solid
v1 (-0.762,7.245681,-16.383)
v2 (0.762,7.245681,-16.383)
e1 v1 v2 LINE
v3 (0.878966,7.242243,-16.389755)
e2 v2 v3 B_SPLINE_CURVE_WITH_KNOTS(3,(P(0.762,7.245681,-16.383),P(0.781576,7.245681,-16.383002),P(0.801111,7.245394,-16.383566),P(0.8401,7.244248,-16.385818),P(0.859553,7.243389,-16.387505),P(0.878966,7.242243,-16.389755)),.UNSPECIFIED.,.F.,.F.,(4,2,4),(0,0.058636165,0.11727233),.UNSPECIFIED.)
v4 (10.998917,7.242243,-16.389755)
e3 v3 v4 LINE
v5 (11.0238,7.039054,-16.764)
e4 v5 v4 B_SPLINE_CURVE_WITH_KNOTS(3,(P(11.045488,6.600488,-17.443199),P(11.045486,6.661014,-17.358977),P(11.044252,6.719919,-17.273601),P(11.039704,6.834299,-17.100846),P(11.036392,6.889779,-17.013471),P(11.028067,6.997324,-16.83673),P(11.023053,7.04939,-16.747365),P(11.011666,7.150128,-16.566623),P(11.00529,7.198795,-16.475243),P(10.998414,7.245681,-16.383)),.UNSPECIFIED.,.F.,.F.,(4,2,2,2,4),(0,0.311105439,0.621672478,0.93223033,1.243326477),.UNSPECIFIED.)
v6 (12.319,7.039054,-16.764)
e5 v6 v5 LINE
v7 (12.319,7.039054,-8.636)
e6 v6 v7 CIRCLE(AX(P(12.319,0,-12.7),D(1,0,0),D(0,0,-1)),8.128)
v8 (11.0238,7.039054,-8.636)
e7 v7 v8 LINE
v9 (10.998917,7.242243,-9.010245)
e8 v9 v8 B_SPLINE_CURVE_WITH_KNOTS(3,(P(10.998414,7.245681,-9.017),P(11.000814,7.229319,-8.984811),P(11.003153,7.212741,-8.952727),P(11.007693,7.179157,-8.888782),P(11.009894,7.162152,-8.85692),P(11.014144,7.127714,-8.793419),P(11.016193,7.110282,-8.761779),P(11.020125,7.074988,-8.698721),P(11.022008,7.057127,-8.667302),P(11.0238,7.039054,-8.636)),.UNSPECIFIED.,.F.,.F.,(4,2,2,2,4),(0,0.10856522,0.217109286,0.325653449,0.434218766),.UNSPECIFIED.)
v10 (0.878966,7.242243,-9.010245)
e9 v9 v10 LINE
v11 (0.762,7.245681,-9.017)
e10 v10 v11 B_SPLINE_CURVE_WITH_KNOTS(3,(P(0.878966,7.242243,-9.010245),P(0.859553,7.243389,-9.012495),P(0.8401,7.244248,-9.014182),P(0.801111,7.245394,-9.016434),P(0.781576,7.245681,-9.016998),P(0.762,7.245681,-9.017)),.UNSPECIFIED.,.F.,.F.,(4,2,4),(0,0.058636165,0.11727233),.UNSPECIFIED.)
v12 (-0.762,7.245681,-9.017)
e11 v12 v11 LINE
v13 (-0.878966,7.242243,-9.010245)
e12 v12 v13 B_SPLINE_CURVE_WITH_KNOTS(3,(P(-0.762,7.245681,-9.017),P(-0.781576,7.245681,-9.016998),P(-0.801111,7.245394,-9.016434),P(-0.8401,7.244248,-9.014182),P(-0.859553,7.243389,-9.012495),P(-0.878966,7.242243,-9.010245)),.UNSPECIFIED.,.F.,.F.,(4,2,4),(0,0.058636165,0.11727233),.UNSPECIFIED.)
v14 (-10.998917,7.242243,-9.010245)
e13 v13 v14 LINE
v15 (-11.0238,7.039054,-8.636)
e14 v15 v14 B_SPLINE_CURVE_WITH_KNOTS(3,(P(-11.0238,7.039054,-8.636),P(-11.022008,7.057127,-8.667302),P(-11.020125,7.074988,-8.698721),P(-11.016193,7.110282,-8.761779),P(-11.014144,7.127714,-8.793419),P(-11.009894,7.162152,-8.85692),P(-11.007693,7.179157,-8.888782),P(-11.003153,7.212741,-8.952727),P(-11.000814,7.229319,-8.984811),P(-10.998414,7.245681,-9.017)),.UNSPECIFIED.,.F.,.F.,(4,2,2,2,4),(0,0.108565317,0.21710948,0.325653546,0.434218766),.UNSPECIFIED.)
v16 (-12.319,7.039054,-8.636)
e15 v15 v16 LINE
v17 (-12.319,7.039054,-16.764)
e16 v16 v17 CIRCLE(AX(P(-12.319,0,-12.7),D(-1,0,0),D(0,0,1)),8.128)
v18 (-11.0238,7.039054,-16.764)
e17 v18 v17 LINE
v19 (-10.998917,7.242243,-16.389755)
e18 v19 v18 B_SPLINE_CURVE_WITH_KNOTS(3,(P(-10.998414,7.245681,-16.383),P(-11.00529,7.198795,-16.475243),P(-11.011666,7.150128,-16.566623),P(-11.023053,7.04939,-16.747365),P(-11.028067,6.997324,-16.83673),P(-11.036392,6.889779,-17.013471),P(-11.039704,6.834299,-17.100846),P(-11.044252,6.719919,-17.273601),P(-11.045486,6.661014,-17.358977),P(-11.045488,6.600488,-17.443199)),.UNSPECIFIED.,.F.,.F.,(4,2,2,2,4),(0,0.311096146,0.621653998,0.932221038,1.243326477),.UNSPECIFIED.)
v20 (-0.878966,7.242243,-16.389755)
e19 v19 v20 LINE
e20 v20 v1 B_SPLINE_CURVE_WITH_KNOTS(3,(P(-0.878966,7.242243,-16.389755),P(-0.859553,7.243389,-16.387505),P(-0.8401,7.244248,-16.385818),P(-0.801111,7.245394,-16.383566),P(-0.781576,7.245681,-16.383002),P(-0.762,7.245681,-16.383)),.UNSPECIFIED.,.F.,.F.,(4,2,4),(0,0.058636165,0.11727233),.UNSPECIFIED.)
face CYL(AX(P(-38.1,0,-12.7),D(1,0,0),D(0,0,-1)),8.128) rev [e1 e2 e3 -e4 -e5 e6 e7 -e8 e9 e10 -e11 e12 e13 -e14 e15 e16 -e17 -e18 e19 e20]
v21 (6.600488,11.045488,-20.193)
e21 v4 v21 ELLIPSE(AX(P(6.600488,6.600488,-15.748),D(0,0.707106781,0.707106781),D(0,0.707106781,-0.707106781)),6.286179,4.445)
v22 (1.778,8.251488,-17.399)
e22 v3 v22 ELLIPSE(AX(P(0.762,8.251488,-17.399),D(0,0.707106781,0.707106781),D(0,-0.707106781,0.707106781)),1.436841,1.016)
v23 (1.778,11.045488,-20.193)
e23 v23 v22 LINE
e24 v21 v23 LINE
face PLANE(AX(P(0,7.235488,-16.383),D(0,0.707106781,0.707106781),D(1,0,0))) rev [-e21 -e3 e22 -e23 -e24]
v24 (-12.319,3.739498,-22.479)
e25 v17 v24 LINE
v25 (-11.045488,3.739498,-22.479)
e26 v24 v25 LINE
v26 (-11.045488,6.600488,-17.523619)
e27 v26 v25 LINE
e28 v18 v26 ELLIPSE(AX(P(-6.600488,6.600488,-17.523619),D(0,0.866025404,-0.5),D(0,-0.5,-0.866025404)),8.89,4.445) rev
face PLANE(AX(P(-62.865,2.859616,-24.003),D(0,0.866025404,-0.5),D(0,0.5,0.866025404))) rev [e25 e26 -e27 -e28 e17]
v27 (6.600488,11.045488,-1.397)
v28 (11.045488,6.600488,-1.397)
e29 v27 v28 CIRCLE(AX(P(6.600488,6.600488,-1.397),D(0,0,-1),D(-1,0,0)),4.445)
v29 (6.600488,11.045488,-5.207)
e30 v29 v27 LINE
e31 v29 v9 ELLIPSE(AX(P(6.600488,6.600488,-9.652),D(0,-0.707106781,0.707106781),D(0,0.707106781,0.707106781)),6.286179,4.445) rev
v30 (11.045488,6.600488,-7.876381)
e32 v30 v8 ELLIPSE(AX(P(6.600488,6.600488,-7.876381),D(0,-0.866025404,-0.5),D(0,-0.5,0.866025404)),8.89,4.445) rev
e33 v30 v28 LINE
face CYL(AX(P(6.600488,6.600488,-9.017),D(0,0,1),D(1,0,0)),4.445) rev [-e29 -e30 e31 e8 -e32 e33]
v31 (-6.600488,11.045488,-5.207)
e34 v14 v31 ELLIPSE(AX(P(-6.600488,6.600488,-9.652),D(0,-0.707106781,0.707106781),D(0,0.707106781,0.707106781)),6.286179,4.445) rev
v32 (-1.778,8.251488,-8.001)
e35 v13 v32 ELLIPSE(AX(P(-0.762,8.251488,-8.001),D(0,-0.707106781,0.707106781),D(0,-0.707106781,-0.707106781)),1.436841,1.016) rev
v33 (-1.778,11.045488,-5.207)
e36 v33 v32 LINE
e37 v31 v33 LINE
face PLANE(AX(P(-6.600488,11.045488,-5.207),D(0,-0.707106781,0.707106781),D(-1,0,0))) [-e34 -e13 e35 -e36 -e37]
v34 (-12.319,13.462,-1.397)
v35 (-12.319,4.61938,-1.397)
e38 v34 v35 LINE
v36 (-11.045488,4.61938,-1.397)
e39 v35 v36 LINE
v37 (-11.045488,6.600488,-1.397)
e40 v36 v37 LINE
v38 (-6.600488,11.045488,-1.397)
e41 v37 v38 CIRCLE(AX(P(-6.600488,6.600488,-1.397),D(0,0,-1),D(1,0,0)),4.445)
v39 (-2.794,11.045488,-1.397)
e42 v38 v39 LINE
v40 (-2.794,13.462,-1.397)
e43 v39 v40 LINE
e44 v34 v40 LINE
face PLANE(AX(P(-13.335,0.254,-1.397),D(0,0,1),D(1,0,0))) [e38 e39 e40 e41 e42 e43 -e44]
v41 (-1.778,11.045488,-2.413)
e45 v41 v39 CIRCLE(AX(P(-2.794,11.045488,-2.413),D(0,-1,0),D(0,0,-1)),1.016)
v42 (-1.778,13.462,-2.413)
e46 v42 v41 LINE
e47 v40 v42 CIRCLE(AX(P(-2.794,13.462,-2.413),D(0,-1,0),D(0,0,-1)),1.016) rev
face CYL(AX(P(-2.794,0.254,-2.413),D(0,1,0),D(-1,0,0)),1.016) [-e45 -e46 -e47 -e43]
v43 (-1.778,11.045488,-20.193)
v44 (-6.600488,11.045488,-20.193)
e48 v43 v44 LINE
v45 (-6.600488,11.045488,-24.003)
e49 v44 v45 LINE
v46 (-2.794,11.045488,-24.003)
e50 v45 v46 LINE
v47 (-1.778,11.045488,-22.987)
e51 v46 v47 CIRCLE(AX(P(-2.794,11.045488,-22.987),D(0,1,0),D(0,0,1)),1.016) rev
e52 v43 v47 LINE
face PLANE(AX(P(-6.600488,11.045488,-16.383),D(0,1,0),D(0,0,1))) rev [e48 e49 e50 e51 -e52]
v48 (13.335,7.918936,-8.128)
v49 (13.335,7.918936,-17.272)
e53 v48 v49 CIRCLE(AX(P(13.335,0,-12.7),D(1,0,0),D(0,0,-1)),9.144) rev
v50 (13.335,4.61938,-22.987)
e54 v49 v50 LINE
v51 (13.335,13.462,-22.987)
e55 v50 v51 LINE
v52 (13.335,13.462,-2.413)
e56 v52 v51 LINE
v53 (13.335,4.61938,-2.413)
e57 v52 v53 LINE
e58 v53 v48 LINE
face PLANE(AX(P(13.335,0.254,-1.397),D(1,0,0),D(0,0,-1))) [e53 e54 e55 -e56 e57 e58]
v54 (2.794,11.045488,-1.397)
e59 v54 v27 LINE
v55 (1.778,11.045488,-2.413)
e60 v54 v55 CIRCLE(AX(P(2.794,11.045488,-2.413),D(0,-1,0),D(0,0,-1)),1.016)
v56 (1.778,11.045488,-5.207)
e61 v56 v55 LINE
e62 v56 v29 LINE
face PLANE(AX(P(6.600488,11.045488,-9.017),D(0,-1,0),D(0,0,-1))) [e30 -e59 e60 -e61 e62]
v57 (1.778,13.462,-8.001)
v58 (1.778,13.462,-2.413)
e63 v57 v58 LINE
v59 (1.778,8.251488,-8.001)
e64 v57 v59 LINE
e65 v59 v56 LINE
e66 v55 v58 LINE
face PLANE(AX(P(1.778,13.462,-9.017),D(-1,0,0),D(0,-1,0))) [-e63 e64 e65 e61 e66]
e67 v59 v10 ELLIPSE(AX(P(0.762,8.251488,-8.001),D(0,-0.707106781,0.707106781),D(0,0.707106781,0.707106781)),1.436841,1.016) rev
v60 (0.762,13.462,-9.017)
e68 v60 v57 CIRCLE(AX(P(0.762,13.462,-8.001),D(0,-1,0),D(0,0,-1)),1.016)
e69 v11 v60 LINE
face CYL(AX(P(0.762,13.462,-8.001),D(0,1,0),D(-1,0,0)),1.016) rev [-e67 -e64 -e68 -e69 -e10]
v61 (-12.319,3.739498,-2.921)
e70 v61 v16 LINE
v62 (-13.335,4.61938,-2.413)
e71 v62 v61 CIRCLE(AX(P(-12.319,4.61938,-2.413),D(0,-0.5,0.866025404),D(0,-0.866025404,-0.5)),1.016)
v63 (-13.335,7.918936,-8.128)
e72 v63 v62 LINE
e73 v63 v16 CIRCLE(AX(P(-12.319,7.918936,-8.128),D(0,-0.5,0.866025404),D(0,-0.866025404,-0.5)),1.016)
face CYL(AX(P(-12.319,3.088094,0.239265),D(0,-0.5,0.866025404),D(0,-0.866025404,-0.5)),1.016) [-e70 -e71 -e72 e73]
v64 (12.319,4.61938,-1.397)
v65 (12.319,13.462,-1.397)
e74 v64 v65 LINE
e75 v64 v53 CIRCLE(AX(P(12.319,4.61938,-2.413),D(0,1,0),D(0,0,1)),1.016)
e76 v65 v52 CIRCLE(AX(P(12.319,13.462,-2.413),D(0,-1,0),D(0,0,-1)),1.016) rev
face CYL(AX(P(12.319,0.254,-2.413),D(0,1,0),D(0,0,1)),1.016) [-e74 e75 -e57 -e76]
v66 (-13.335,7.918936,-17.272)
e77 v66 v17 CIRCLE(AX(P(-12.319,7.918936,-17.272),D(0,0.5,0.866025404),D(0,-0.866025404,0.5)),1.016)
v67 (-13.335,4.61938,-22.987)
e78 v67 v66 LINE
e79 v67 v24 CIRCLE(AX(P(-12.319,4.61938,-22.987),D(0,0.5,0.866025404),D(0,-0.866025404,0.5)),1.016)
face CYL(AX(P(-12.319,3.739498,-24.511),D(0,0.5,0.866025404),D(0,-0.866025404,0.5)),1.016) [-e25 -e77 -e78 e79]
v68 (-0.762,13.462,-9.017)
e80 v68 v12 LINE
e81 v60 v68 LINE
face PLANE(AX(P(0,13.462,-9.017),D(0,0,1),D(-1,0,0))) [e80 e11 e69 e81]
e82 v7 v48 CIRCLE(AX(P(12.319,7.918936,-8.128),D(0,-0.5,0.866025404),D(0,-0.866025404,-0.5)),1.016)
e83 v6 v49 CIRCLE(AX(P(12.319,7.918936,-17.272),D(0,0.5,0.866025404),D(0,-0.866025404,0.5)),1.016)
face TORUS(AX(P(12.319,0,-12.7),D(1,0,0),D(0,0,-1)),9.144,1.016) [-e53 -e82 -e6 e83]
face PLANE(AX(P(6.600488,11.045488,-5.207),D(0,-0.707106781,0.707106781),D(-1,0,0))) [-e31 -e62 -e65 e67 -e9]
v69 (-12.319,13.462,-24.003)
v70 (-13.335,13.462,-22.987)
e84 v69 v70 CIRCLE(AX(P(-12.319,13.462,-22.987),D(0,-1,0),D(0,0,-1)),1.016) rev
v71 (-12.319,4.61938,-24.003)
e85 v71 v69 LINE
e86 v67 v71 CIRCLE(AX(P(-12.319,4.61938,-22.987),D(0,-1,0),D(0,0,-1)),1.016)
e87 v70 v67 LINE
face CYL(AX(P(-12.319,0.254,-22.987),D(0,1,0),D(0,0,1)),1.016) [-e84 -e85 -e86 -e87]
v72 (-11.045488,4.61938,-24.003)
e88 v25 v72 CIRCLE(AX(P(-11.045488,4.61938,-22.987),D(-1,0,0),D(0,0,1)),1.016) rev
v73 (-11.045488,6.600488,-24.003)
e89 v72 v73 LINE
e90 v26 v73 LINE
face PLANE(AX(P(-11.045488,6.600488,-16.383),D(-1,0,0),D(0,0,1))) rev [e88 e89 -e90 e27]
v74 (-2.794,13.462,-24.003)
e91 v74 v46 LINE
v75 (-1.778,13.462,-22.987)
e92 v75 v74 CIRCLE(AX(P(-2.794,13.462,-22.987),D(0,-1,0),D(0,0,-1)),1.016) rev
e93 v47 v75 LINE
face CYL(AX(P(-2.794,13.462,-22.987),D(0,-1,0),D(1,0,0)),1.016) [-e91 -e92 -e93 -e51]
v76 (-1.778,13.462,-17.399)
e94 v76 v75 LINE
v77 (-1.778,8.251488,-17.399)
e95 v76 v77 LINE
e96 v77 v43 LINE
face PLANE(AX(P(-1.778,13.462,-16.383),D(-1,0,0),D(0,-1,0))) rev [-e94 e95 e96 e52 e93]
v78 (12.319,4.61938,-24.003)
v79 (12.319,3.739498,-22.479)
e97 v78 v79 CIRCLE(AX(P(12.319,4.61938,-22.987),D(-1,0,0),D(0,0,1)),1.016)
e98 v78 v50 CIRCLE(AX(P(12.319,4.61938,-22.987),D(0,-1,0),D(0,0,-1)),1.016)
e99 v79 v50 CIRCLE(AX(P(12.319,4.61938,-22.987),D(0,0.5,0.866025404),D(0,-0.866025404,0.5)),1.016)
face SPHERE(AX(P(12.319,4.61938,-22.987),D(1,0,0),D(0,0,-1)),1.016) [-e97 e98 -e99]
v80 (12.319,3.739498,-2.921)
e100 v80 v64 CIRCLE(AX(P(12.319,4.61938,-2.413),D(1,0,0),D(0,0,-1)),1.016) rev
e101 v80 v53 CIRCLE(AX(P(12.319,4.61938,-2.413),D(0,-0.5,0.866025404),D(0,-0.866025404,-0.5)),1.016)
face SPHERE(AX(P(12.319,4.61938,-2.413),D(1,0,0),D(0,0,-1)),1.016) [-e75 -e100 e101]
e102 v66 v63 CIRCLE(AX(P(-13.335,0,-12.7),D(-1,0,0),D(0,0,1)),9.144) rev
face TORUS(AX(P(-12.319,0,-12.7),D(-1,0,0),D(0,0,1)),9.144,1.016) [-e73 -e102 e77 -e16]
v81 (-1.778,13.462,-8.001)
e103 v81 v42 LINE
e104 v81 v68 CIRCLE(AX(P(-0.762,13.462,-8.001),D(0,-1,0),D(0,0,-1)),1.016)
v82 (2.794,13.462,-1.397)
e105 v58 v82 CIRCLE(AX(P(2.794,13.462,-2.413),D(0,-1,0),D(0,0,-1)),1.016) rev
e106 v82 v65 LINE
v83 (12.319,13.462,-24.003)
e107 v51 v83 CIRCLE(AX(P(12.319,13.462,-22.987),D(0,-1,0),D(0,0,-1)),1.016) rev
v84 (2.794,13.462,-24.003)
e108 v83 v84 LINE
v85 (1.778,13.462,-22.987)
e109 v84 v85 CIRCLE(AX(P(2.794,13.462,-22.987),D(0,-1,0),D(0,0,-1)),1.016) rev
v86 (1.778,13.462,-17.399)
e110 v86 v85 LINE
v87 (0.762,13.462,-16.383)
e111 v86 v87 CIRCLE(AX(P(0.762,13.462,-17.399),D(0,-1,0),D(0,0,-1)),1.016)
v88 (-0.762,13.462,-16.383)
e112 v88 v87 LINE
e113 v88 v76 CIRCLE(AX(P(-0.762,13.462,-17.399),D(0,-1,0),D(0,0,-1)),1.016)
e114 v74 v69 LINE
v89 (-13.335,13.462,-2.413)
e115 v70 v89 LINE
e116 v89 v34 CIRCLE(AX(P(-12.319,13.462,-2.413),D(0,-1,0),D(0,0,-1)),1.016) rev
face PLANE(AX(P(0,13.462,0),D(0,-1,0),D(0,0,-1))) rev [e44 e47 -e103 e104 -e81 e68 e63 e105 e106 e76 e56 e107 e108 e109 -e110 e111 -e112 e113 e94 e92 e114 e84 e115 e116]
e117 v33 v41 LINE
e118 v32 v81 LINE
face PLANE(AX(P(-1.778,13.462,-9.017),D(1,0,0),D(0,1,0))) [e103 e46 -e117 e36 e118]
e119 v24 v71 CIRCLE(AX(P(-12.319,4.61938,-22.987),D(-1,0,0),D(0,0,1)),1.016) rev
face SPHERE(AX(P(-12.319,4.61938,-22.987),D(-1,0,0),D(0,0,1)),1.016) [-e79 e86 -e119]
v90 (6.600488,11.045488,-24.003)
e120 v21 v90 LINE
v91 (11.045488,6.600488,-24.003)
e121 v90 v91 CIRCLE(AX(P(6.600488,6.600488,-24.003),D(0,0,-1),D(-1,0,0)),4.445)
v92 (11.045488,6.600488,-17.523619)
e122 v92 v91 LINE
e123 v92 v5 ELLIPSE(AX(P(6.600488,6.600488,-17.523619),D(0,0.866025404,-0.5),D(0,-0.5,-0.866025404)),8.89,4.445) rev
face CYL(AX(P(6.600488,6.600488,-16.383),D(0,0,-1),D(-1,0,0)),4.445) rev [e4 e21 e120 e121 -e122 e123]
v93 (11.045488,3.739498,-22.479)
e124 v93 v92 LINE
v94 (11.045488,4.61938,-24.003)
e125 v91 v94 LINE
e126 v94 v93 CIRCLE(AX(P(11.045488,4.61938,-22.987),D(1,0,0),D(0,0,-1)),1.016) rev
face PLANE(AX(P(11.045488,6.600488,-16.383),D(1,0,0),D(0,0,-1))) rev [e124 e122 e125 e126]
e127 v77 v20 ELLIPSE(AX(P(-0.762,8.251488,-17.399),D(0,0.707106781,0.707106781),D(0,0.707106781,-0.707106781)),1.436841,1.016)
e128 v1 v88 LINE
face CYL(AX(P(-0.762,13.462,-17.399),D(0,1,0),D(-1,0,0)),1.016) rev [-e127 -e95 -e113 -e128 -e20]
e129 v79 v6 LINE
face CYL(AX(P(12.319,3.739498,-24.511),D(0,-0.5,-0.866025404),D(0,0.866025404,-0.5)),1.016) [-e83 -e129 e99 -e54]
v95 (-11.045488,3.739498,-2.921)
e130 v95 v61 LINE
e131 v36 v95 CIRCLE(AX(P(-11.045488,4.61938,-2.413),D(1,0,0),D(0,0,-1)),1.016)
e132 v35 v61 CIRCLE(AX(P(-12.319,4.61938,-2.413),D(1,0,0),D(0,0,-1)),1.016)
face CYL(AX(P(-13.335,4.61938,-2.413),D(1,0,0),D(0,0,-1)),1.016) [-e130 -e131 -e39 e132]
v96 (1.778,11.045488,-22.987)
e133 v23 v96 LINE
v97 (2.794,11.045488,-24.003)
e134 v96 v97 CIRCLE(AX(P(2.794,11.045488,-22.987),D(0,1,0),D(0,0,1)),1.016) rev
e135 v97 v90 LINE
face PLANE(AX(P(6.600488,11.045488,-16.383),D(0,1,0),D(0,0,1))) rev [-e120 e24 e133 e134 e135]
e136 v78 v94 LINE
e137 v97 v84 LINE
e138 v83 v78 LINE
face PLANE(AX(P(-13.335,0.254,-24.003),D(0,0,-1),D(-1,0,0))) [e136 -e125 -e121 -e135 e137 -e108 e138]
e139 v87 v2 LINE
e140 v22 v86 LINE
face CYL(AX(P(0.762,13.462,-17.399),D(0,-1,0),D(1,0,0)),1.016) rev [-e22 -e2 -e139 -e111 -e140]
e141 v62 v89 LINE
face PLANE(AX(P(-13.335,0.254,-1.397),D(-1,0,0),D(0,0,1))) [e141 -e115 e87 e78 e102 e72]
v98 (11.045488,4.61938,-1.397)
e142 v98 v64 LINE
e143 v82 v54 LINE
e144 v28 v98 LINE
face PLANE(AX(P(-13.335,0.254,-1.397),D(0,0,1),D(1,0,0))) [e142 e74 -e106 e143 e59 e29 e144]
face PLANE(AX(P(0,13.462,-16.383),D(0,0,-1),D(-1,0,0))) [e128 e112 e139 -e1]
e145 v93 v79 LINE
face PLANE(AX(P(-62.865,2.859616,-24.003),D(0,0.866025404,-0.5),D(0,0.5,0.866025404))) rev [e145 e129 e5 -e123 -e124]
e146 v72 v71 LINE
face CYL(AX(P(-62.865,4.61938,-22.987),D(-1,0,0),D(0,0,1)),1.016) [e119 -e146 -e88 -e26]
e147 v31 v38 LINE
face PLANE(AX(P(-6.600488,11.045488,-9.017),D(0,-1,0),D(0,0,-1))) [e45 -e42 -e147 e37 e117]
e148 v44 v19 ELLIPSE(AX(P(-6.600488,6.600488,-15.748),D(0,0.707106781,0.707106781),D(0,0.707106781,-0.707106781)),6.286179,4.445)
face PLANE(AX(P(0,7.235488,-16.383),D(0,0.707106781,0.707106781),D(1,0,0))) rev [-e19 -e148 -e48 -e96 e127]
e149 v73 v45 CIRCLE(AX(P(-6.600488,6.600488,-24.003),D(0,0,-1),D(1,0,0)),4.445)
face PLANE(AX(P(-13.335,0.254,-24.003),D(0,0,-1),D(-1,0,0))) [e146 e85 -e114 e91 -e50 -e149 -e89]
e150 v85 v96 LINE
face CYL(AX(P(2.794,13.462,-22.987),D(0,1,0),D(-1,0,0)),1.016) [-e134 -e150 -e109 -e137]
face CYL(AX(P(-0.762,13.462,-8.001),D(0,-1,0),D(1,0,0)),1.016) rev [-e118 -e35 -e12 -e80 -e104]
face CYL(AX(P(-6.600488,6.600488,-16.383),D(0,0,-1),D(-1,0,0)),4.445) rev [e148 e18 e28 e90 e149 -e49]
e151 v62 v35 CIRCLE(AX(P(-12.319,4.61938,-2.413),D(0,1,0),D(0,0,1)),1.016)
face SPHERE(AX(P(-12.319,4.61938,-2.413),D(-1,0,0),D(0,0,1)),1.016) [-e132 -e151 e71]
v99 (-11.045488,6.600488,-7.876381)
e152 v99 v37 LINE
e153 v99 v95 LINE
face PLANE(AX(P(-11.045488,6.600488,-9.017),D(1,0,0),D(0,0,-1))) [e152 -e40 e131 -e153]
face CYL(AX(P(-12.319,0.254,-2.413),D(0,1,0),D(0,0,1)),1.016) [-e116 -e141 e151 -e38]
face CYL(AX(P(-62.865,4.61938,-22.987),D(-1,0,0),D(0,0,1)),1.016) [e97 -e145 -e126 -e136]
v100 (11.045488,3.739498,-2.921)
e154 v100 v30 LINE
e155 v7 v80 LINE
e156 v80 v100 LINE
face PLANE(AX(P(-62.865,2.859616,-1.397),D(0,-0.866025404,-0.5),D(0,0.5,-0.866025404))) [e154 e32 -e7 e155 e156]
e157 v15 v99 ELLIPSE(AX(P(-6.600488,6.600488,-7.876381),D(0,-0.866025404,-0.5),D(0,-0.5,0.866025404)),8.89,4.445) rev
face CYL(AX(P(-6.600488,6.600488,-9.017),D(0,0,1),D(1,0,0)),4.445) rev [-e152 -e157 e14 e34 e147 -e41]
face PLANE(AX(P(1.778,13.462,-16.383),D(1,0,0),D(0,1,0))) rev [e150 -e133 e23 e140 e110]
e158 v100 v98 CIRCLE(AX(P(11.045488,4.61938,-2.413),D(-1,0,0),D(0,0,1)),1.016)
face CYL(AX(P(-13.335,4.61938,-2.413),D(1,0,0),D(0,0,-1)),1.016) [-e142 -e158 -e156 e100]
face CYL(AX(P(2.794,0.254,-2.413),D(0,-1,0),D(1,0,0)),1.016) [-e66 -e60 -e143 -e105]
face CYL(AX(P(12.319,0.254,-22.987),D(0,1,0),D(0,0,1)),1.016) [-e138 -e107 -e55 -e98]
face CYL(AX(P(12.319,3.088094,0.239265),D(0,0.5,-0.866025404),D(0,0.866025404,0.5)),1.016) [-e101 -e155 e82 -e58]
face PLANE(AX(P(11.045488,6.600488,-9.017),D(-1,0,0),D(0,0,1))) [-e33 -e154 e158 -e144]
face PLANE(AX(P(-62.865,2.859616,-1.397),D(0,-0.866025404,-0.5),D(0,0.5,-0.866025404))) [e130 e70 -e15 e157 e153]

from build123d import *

# Parameters (mm, degrees)
SKETCH23_W          = 26.67
SKETCH23_H          = 22.606
BOSS_EXTRUDE8_DEPTH = 13.208
CUT_EXTRUDE1_DEPTH  = 7.62
SKETCH27_R          = 8.128
CUT_EXTRUDE3_DEPTH  = 38.1
CUT_EXTRUDE4_DEPTH  = 76.2
CHAMFER1_SIZE       = 3.81
FILLET1_R           = 1.016
FILLET2_R           = 1.016
FILLET4_R           = 1.016


with BuildPart() as part:
    # Sketch23 → Boss-Extrude8 (new body)
    with BuildSketch(Plane(origin=(0, 13.462, 0), x_dir=(1, 0, 0), z_dir=(0, 1, 0))):
        with Locations((0, 12.7)):
            Rectangle(SKETCH23_W, SKETCH23_H)
    extrude(amount=-BOSS_EXTRUDE8_DEPTH)

    # Sketch25 → Cut-Extrude1 (cut)
    with BuildSketch(Plane(origin=(0, 0, -24.003), x_dir=(-1, 0, 0), z_dir=(0, 0, -1))):
        with BuildLine():
            Line((1.778, 13.462), (1.778, 11.045488249))
            Line((1.778, 11.045488249), (6.600488249, 11.045488249))
            ThreePointArc((6.600488249, 11.045488249), (9.743577891, 9.743577891), (11.045488249, 6.600488249))
            Line((11.045488249, 6.600488249), (11.045488249, 0.254))
            Line((11.045488249, 0.254), (-11.045488249, 0.254))
            Line((-11.045488249, 0.254), (-11.045488249, 6.600488249))
            ThreePointArc((-11.045488249, 6.600488249), (-9.743577891, 9.743577891), (-6.600488249, 11.045488249))
            Line((-6.600488249, 11.045488249), (-1.778, 11.045488249))
            Line((-1.778, 11.045488249), (-1.778, 13.462))
            ThreePointArc((-1.778, 13.462), (0, 15.24), (1.778, 13.462))
        make_face()
    cut_extrude1 = extrude(amount=-CUT_EXTRUDE1_DEPTH, mode=Mode.SUBTRACT)

    # Sketch27 → Cut-Extrude3 (cut, symmetric)
    with BuildSketch(Plane(origin=(0, 0, 0), x_dir=(0, 0, -1), z_dir=(1, 0, 0))):
        with Locations((12.7, 0)):
            Circle(SKETCH27_R)
    extrude(amount=CUT_EXTRUDE3_DEPTH, both=True, mode=Mode.SUBTRACT)

    # Sketch28 → Cut-Extrude4 (cut)
    with BuildSketch(Plane(origin=(13.335, 0, 0), x_dir=(0, 0, -1), z_dir=(1, 0, 0))):
        with BuildLine():
            Line((1.397, 2.859615883), (8.636, 7.039054482))
            ThreePointArc((8.636, 7.039054482), (12.7, 8.128), (16.764, 7.039054482))
            Line((16.764, 7.039054482), (24.003, 2.859615883))
            Line((24.003, 2.859615883), (24.003, 0.254))
            Line((24.003, 0.254), (1.397, 0.254))
            Line((1.397, 0.254), (1.397, 2.859615883))
        make_face()
    extrude(amount=-CUT_EXTRUDE4_DEPTH, mode=Mode.SUBTRACT)

    # Mirror1: Cut-Extrude1 across plane
    add(cut_extrude1.mirror(Plane.XY.offset(-12.7)), mode=Mode.SUBTRACT)

    # Chamfer1
    # the kernel refuses this chamfer: 3.81 mm, written as the material it adds along each edge
    with BuildSketch(Plane(origin=(8.020112184, 11.045488249, -16.383), x_dir=(0, -1, 0), z_dir=(-1, 0, 0))) as chamfer1_piece_1_section:
        Polygon((CHAMFER1_SIZE, 0), (0, -CHAMFER1_SIZE), (0, 0), align=None)
    chamfer1_piece_1 = extrude(amount=24.418712617, mode=Mode.PRIVATE)
    chamfer1_piece_1 = split(chamfer1_piece_1, bisect_by=Plane(origin=(1.778, 11.045488249, -16.383), z_dir=(1, 0, 0)), keep=Keep.TOP, mode=Mode.PRIVATE)
    chamfer1_piece_1 = chamfer1_piece_1 - Plane(origin=(8.020112184, 0, -12.7), x_dir=(0, 0, -1), z_dir=(1, 0, 0)) * Cylinder(8.128, 65, mode=Mode.PRIVATE)
    add(chamfer1_piece_1)
    with BuildSketch(Plane(origin=(-1.778, 11.045488249, -16.383), x_dir=(0, -1, 0), z_dir=(-1, 0, 0))) as chamfer1_piece_2_section:
        Polygon((CHAMFER1_SIZE, 0), (0, -CHAMFER1_SIZE), (0, 0), align=None)
    chamfer1_piece_2 = extrude(amount=14.620600433, mode=Mode.PRIVATE)
    chamfer1_piece_2 = split(chamfer1_piece_2, bisect_by=Plane(origin=(-13.335, 11.045488249, -16.383), z_dir=(1, 0, 0)), keep=Keep.TOP, mode=Mode.PRIVATE)
    chamfer1_piece_2 = chamfer1_piece_2 - Plane(origin=(-1.778, 0, -12.7), x_dir=(0, 0, -1), z_dir=(1, 0, 0)) * Cylinder(8.128, 45, mode=Mode.PRIVATE)
    add(chamfer1_piece_2)
    with BuildSketch(Plane(origin=(16.398600433, 11.045488249, -16.383), x_dir=(0, -1, 0), z_dir=(-1, 0, 0))) as chamfer1_piece_3_section:
        Polygon((CHAMFER1_SIZE, 0), (0, -CHAMFER1_SIZE), (0, 0), align=None)
    chamfer1_piece_3 = extrude(amount=14.620600433, mode=Mode.PRIVATE)
    chamfer1_piece_3 = split(chamfer1_piece_3, bisect_by=Plane(origin=(13.335, 11.045488249, -16.383), z_dir=(-1, 0, 0)), keep=Keep.TOP, mode=Mode.PRIVATE)
    chamfer1_piece_3 = chamfer1_piece_3 - Plane(origin=(16.398600433, 0, -12.7), x_dir=(0, 0, -1), z_dir=(1, 0, 0)) * Cylinder(8.128, 45, mode=Mode.PRIVATE)
    add(chamfer1_piece_3)
    with BuildSketch(Plane(origin=(16.398600433, 11.045488249, -16.383), x_dir=(0, -1, 0), z_dir=(-1, 0, 0))) as chamfer1_piece_4_section:
        Polygon((CHAMFER1_SIZE, 0), (0, -CHAMFER1_SIZE), (0, 0), align=None)
    chamfer1_piece_4 = extrude(amount=24.418712617, mode=Mode.PRIVATE)
    chamfer1_piece_4 = split(chamfer1_piece_4, bisect_by=Plane(origin=(-1.778, 11.045488249, -16.383), z_dir=(-1, 0, 0)), keep=Keep.TOP, mode=Mode.PRIVATE)
    chamfer1_piece_4 = chamfer1_piece_4 - Plane(origin=(16.398600433, 0, -12.7), x_dir=(0, 0, -1), z_dir=(1, 0, 0)) * Cylinder(8.128, 65, mode=Mode.PRIVATE)
    add(chamfer1_piece_4)
    with BuildSketch(Plane(origin=(8.020112184, 11.045488249, -9.017), x_dir=(0, 0, 1), z_dir=(-1, 0, 0))) as chamfer1_piece_5_section:
        Polygon((CHAMFER1_SIZE, 0), (0, -CHAMFER1_SIZE), (0, 0), align=None)
    chamfer1_piece_5 = extrude(amount=24.418712617, mode=Mode.PRIVATE)
    chamfer1_piece_5 = split(chamfer1_piece_5, bisect_by=Plane(origin=(1.778, 11.045488249, -9.017), z_dir=(1, 0, 0)), keep=Keep.TOP, mode=Mode.PRIVATE)
    chamfer1_piece_5 = chamfer1_piece_5 - Plane(origin=(8.020112184, 0, -12.7), x_dir=(0, 0, -1), z_dir=(1, 0, 0)) * Cylinder(8.128, 65, mode=Mode.PRIVATE)
    add(chamfer1_piece_5)
    with BuildSketch(Plane(origin=(-1.778, 11.045488249, -9.017), x_dir=(0, 0, 1), z_dir=(-1, 0, 0))) as chamfer1_piece_6_section:
        Polygon((CHAMFER1_SIZE, 0), (0, -CHAMFER1_SIZE), (0, 0), align=None)
    chamfer1_piece_6 = extrude(amount=14.620600433, mode=Mode.PRIVATE)
    chamfer1_piece_6 = split(chamfer1_piece_6, bisect_by=Plane(origin=(-13.335, 11.045488249, -9.017), z_dir=(1, 0, 0)), keep=Keep.TOP, mode=Mode.PRIVATE)
    chamfer1_piece_6 = chamfer1_piece_6 - Plane(origin=(-1.778, 0, -12.7), x_dir=(0, 0, -1), z_dir=(1, 0, 0)) * Cylinder(8.128, 45, mode=Mode.PRIVATE)
    add(chamfer1_piece_6)
    with BuildSketch(Plane(origin=(16.398600433, 11.045488249, -9.017), x_dir=(0, -1, 0), z_dir=(-1, 0, 0))) as chamfer1_piece_7_section:
        Polygon((CHAMFER1_SIZE, 0), (0, CHAMFER1_SIZE), (0, 0), align=None)
    chamfer1_piece_7 = extrude(amount=14.620600433, mode=Mode.PRIVATE)
    chamfer1_piece_7 = split(chamfer1_piece_7, bisect_by=Plane(origin=(13.335, 11.045488249, -9.017), z_dir=(-1, 0, 0)), keep=Keep.TOP, mode=Mode.PRIVATE)
    chamfer1_piece_7 = chamfer1_piece_7 - Plane(origin=(16.398600433, 0, -12.7), x_dir=(0, 0, -1), z_dir=(1, 0, 0)) * Cylinder(8.128, 45, mode=Mode.PRIVATE)
    add(chamfer1_piece_7)
    with BuildSketch(Plane(origin=(16.398600433, 11.045488249, -9.017), x_dir=(0, -1, 0), z_dir=(-1, 0, 0))) as chamfer1_piece_8_section:
        Polygon((CHAMFER1_SIZE, 0), (0, CHAMFER1_SIZE), (0, 0), align=None)
    chamfer1_piece_8 = extrude(amount=24.418712617, mode=Mode.PRIVATE)
    chamfer1_piece_8 = split(chamfer1_piece_8, bisect_by=Plane(origin=(-1.778, 11.045488249, -9.017), z_dir=(-1, 0, 0)), keep=Keep.TOP, mode=Mode.PRIVATE)
    chamfer1_piece_8 = chamfer1_piece_8 - Plane(origin=(16.398600433, 0, -12.7), x_dir=(0, 0, -1), z_dir=(1, 0, 0)) * Cylinder(8.128, 65, mode=Mode.PRIVATE)
    add(chamfer1_piece_8)

    # Fillet1
    fillet1_edges = [part.edges().sort_by_distance(p)[0] for p in [
        (12.190244124, 2.859615883, -1.397),
        (-12.190244124, 2.859615883, -24.003),
        (12.190244124, 2.859615883, -24.003),
        (-12.190244124, 2.859615883, -1.397),
    ]]
    fillet(fillet1_edges, radius=FILLET1_R)

    # Fillet2
    fillet2_edges = [part.edges().sort_by_distance(p)[0] for p in [
        (1.778, 10.353840564, -9.017),
        (-1.778, 10.353840564, -9.017),
        (1.778, 12.253744124, -1.397),
        (-1.778, 12.253744124, -1.397),
        (1.778, 10.353840564, -16.383),
        (-1.778, 10.353840564, -16.383),
        (-1.778, 12.253744124, -24.003),
        (1.778, 12.253744124, -24.003),
    ]]
    fillet(fillet2_edges, radius=FILLET2_R)

    # Fillet4
    fillet4_edges = [part.edges().sort_by_distance(p)[0] for p in [
        (13.335, 9.040689752, -1.397),
        (13.335, 5.389276088, -5.7785),
        (13.335, 5.389276088, -19.6215),
        (13.335, 9.040689752, -24.003),
        (13.335, 3.739497694, -23.495),
        (13.335, 3.739497694, -1.905),
        (-13.335, 9.040689752, -1.397),
        (-13.335, 9.040689752, -24.003),
        (-13.335, 3.739497694, -23.495),
        (-13.335, 3.739497694, -1.905),
        (13.335, 8.128, -12.7),
        (-13.335, 8.128, -12.7),
        (-13.335, 5.389276088, -19.6215),
        (-13.335, 5.389276088, -5.7785),
    ]]
    fillet(fillet4_edges, radius=FILLET4_R)


solid = part.part
